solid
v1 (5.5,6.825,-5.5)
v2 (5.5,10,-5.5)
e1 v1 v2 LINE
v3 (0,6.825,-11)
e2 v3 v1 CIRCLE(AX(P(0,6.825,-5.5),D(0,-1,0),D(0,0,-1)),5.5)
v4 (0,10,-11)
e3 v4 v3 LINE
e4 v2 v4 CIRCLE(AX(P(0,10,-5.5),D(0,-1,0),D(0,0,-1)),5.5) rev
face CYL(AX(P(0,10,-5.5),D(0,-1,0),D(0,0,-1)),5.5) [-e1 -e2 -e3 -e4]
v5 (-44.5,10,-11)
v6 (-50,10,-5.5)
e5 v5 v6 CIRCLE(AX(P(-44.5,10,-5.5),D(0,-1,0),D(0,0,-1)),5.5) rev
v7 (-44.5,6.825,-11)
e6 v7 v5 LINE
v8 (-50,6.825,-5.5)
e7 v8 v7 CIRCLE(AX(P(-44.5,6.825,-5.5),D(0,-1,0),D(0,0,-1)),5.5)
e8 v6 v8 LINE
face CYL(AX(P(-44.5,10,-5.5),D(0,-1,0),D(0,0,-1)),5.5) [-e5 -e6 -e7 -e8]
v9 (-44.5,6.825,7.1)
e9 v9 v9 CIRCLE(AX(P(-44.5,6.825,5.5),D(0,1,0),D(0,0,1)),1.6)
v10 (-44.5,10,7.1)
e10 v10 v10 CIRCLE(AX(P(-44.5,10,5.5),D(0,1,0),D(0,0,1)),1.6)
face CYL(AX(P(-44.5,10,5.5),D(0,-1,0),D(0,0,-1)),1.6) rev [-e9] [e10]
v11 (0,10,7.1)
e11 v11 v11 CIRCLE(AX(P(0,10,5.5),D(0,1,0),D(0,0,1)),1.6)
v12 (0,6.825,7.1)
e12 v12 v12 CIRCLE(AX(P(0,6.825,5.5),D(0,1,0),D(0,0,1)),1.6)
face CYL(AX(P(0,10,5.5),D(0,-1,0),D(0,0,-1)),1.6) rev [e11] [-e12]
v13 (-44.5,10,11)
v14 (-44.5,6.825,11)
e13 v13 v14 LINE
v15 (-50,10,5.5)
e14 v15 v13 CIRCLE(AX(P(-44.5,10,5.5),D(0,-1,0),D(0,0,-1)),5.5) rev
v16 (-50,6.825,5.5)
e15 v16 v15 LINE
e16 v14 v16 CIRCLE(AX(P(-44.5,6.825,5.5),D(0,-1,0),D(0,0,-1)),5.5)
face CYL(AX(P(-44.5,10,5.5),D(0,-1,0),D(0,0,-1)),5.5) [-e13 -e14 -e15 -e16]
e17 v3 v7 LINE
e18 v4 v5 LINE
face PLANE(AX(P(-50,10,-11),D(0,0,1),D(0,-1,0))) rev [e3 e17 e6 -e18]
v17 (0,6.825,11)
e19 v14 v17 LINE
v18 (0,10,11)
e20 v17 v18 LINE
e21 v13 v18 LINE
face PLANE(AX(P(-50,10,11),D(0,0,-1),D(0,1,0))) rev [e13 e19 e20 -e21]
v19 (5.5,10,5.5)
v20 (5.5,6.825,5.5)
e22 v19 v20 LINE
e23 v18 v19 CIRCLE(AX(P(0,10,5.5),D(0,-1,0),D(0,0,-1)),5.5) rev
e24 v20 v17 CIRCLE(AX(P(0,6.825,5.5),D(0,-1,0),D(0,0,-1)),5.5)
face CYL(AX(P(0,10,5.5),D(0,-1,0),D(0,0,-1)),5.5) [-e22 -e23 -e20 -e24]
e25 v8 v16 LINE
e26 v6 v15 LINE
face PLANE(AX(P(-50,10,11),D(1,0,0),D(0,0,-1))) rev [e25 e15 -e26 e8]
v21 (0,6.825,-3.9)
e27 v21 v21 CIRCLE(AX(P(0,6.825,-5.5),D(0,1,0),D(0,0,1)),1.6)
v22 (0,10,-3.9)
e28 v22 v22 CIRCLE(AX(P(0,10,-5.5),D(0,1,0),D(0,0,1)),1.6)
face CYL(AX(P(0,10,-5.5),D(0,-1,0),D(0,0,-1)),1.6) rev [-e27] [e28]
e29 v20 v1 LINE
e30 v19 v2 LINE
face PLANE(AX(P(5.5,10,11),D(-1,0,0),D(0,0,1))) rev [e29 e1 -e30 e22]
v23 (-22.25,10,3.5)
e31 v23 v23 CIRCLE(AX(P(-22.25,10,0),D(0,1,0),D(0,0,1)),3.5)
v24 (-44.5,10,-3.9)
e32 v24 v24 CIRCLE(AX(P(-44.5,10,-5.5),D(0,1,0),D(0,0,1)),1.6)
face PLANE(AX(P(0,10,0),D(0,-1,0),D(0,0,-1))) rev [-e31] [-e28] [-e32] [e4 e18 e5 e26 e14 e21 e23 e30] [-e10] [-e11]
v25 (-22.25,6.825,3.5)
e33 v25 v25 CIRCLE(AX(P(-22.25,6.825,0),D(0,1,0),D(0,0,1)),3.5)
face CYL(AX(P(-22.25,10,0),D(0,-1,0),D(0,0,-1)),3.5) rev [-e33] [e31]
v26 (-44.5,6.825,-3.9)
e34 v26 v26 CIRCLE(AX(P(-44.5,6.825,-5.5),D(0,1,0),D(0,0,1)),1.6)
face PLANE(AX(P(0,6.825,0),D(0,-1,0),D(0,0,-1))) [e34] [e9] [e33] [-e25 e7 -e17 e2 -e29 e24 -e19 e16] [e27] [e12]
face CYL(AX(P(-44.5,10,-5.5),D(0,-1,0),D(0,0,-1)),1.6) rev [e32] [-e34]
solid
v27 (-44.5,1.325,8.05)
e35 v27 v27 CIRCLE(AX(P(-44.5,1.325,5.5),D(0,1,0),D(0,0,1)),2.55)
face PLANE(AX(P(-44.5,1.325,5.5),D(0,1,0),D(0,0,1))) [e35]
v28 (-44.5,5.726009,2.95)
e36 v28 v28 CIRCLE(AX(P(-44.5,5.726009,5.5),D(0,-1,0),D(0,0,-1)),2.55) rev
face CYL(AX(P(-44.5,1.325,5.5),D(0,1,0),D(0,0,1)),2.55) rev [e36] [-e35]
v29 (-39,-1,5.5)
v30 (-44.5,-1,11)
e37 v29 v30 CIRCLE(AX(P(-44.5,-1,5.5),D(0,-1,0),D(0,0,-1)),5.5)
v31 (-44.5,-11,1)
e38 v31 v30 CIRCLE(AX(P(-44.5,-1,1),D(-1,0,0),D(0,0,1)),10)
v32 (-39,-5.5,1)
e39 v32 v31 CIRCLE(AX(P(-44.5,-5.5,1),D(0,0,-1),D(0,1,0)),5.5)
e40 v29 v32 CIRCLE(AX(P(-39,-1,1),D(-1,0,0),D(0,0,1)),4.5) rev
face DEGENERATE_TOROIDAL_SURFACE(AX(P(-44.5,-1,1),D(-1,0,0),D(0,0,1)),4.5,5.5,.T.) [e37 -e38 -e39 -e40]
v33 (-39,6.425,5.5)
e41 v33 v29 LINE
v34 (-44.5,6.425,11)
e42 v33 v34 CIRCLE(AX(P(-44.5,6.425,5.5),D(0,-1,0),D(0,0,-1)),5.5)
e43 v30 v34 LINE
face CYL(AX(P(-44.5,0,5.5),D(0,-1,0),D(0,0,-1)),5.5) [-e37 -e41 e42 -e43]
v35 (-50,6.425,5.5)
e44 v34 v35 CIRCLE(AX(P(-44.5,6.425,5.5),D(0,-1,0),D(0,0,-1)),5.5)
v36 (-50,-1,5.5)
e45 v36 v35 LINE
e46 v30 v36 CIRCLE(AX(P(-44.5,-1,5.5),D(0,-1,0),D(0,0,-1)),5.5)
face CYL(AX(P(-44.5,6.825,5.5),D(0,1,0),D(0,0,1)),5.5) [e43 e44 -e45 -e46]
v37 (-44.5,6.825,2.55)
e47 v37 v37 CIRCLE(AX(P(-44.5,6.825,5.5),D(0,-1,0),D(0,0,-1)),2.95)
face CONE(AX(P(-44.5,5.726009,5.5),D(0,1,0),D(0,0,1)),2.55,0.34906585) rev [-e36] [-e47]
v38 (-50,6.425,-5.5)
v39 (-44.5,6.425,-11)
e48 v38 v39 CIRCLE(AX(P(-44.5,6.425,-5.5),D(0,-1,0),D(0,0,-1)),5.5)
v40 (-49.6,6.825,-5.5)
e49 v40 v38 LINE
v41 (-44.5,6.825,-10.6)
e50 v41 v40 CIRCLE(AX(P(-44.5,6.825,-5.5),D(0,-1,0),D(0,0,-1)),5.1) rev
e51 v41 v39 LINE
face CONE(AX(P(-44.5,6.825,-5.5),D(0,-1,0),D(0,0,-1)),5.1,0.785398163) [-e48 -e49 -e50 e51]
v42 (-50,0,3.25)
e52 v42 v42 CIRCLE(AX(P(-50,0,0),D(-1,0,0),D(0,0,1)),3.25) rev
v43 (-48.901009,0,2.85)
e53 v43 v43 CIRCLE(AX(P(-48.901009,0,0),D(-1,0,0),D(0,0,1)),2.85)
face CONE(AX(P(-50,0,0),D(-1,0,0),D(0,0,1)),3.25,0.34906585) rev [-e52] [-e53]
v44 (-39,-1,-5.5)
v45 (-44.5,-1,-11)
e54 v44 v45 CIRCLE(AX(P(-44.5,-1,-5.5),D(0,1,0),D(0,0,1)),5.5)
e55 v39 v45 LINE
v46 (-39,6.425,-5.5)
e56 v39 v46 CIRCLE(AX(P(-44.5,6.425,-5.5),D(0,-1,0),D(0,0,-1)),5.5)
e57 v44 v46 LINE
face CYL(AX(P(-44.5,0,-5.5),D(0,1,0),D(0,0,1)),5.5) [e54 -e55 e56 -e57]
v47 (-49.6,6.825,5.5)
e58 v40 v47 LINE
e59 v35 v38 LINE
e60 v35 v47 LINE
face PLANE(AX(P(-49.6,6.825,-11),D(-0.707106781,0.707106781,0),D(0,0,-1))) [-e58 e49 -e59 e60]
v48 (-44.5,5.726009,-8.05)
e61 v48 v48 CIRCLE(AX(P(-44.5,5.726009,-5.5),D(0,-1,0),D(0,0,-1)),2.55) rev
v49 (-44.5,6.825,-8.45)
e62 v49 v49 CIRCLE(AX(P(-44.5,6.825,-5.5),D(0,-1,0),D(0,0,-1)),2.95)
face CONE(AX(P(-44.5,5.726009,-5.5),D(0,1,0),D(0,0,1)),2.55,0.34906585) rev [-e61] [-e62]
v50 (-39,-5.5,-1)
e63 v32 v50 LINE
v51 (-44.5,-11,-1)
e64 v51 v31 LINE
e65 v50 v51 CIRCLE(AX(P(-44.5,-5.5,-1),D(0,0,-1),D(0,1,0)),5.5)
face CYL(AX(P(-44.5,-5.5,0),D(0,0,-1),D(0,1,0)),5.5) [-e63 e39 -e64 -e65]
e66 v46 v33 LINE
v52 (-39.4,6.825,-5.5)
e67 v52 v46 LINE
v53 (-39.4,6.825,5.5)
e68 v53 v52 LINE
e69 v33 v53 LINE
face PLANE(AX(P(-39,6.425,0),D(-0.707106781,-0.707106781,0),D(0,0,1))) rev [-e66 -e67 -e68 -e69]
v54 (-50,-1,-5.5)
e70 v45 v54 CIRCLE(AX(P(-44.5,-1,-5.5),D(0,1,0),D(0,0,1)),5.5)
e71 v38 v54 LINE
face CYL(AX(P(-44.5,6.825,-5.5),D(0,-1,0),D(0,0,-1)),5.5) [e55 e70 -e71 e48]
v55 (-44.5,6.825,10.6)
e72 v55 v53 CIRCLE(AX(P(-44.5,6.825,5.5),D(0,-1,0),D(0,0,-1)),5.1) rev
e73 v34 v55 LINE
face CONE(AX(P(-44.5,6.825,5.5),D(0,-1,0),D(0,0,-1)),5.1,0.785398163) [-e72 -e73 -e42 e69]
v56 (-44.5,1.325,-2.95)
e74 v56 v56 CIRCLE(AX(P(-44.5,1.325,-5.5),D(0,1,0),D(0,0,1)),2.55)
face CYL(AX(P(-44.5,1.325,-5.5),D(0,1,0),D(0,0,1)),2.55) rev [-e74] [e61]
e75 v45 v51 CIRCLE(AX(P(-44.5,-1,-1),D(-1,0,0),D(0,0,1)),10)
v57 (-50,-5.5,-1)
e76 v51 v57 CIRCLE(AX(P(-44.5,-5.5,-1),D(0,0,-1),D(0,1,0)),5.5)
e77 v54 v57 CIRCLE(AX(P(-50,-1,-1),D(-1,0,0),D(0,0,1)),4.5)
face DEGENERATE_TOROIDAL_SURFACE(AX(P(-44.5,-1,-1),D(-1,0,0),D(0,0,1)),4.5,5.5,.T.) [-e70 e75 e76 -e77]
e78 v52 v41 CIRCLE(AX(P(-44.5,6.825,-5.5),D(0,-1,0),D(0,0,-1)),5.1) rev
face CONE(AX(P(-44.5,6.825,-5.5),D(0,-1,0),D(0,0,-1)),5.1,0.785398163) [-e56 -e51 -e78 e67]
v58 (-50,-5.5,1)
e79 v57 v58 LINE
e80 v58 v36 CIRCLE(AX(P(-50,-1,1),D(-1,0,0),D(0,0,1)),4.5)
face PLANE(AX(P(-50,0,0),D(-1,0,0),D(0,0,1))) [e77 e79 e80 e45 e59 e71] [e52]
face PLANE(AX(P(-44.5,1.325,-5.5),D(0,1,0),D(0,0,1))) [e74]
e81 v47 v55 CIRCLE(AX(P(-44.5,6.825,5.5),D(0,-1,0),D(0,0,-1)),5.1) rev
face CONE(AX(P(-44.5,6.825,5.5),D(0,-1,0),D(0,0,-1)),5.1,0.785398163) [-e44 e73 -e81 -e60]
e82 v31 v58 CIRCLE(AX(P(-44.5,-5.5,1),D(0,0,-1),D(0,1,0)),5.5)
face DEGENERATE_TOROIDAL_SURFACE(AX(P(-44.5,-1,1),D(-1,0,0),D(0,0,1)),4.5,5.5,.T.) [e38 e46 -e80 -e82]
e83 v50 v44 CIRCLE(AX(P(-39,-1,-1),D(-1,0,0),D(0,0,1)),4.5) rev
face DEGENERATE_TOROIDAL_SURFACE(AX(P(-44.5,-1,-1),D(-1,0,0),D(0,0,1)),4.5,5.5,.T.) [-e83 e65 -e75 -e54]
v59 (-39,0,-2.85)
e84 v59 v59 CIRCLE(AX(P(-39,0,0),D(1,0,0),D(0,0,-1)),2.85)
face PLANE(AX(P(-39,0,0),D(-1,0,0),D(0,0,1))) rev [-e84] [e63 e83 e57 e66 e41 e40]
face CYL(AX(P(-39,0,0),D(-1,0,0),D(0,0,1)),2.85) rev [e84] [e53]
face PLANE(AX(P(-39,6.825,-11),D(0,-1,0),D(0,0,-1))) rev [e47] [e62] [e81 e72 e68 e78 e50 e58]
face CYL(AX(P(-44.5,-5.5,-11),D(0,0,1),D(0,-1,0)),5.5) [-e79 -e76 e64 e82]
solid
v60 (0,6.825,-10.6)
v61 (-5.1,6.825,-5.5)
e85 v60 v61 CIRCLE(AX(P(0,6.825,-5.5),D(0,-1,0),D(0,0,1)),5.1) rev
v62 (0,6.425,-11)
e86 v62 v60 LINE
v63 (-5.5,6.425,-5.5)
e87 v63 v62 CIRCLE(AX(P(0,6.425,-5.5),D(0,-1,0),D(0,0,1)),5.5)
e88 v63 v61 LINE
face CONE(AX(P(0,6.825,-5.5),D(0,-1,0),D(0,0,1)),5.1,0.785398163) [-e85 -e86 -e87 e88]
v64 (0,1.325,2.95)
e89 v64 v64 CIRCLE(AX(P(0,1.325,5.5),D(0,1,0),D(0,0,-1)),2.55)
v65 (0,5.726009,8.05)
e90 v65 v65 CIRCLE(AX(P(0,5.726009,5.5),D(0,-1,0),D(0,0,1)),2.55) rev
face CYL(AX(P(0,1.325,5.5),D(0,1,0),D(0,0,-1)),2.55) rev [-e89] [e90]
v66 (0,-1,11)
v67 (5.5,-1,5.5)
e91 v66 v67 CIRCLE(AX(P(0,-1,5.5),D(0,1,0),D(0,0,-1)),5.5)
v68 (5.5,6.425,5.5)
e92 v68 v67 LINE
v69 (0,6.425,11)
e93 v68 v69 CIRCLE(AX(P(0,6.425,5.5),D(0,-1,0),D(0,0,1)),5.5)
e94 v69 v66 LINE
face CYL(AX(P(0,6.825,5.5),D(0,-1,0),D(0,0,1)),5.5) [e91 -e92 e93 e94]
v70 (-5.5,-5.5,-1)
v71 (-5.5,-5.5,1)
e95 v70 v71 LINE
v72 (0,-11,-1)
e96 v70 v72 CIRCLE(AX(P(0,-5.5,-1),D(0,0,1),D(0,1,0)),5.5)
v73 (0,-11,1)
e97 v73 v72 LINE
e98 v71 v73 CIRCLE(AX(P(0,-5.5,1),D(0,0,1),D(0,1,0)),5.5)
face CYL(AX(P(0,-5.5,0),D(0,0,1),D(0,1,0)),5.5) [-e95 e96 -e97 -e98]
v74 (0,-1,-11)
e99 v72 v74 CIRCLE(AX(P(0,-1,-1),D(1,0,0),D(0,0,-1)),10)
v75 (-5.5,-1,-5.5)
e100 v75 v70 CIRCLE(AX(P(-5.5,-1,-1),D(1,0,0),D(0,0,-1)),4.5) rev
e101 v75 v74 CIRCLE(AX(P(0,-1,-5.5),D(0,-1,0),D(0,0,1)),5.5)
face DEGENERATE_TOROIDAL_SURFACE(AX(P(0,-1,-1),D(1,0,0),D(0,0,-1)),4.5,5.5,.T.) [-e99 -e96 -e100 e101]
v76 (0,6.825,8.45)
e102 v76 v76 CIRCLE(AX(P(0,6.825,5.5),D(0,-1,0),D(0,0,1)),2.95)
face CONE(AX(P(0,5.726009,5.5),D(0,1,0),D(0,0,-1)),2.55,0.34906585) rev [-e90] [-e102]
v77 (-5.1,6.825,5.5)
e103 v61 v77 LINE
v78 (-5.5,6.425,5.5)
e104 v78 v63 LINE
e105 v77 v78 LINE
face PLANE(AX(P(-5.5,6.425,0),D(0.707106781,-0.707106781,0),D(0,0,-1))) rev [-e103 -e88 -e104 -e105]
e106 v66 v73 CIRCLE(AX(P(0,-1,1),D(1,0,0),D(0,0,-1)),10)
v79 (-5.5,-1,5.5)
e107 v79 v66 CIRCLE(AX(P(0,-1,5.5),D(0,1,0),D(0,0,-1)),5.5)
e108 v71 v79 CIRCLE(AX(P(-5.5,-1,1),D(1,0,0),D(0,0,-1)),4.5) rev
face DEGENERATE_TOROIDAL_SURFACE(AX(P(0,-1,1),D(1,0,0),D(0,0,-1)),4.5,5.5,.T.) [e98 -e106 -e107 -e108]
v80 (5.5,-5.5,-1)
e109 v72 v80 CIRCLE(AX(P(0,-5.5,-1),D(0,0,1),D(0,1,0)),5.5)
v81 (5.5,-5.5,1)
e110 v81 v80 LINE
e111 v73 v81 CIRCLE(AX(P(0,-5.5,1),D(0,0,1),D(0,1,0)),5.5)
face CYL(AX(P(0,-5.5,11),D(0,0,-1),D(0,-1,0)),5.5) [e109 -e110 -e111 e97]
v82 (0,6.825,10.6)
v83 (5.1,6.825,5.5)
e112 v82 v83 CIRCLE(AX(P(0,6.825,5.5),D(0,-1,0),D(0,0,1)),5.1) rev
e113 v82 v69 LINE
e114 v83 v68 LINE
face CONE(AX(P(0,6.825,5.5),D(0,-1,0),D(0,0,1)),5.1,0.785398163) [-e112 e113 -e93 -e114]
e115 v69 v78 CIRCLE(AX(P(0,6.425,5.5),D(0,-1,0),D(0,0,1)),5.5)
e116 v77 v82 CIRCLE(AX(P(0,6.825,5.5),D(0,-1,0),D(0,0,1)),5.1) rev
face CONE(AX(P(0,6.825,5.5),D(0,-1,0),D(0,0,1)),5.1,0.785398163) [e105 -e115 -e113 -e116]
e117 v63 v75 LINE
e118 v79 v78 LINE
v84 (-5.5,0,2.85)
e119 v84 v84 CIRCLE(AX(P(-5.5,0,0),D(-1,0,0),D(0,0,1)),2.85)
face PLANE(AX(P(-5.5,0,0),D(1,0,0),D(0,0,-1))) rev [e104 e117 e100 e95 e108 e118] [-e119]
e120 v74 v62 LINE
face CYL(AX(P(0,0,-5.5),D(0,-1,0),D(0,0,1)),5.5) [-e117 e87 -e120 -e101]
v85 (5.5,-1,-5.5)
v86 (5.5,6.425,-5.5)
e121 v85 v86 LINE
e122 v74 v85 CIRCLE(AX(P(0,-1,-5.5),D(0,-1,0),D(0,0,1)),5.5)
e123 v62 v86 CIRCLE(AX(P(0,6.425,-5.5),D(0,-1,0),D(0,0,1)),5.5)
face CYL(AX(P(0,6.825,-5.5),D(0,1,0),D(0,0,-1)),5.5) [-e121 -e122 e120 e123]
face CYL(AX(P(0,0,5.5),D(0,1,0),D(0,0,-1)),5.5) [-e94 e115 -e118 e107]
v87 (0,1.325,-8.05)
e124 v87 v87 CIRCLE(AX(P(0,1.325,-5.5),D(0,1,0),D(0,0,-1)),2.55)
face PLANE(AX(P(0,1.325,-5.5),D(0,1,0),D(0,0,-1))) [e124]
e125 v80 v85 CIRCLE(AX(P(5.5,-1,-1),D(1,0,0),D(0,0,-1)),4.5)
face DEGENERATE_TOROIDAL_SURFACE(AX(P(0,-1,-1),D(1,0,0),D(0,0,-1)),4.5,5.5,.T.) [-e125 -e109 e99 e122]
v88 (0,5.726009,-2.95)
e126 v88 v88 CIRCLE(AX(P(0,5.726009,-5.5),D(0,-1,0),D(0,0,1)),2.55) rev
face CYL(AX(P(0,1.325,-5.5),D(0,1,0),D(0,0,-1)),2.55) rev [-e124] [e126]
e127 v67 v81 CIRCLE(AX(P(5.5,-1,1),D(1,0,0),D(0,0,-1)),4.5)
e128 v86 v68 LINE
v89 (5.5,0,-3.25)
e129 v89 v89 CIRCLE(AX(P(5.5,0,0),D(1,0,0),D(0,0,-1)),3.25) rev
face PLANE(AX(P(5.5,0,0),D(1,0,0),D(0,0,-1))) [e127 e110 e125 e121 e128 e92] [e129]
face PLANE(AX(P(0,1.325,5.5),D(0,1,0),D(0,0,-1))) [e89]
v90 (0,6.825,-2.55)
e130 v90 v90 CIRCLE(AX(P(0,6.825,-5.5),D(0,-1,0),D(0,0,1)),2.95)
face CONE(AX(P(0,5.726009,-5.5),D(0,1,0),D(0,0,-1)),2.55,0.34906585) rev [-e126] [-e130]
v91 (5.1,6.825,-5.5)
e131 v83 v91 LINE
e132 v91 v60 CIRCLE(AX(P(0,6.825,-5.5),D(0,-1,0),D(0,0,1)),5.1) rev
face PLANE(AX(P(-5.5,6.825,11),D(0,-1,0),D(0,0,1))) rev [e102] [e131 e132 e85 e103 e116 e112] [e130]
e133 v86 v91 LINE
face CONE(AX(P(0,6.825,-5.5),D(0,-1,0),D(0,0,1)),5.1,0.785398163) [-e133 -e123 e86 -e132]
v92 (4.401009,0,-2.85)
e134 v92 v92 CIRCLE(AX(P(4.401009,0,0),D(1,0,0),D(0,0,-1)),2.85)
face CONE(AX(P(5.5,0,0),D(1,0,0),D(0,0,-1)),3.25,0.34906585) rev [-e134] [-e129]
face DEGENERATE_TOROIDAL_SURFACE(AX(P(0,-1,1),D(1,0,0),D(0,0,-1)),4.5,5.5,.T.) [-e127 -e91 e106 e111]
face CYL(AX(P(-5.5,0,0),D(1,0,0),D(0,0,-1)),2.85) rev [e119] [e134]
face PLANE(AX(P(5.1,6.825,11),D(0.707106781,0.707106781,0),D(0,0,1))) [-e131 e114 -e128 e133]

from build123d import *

# Parameters (mm, degrees)
SKETCH2_W             = 22
SKETCH2_H             = 17.825
SKETCH2_R             = 2.85
BOSS_EXTRUDE1_DEPTH   = 5.5
FILLET1_R             = 10
FILLET2_R             = 5.5
SKETCH4_R             = 2.55
CUT_EXTRUDE1_DEPTH    = 5.5
CHAMFER1_SIZE         = 0.4
CHAMFER1_SIZE2        = 1.098990968
CHAMFER4_SIZE         = 0.4
CHAMFER5_SIZE         = 0.4
CHAMFER5_SIZE2        = 1.098990968
BODY_MOVE_COPY1_ANGLE = 180
SKETCH5_W             = 55.5
SKETCH5_H             = 22
SKETCH5_R             = 1.6
SKETCH5_R_2           = 3.5
BOSS_EXTRUDE2_DEPTH   = 3.175
FILLET3_R             = 5.5


with BuildPart() as part:
    # Sketch2 → Boss-Extrude1 (new, symmetric)
    with BuildSketch(Plane(origin=(0, 0, 0), x_dir=(0, 0, -1), z_dir=(1, 0, 0))):
        with Locations((0, -2.0875)):
            Rectangle(SKETCH2_W, SKETCH2_H)
        Circle(SKETCH2_R, mode=Mode.SUBTRACT)
    extrude(amount=BOSS_EXTRUDE1_DEPTH, both=True)

    # Fillet1
    fillet1_edges = [part.edges().sort_by_distance(p)[0] for p in [
        (0, -11, -11),
        (0, -11, 11),
    ]]
    fillet(fillet1_edges, radius=FILLET1_R)

    # Fillet2
    fillet2_edges = [part.edges().sort_by_distance(p)[0] for p in [
        (-5.5, 2.9125, -11),
        (-5.5, -8.071067812, -8.071067812),
        (-5.5, -8.071067812, 8.071067812),
        (5.5, 2.9125, -11),
        (5.5, -8.071067812, -8.071067812),
        (5.5, -8.071067812, 8.071067812),
        (-5.5, 2.9125, 11),
        (5.5, 2.9125, 11),
        (-5.5, -11, 0),
        (5.5, -11, 0),
    ]]
    fillet(fillet2_edges, radius=FILLET2_R - 0.0001)  # a hair under: the kernel refuses the full size

    # Sketch4 → Cut-Extrude1 (cut)
    with BuildSketch(Plane(origin=(0, 6.825, 0), x_dir=(1, 0, 0), z_dir=(0, 1, 0))):
        with Locations(Location((0, 5.5, 0), (0, 0, 270))):
            Circle(SKETCH4_R)
        with Locations(Location((0, -5.5, 0), (0, 0, 270))):
            Circle(SKETCH4_R)
    extrude(amount=-CUT_EXTRUDE1_DEPTH, mode=Mode.SUBTRACT)

    # Chamfer1
    chamfer1_edges = [part.edges().sort_by_distance(p)[0] for p in [
        (-5.5, 0, 2.85),
    ]]
    chamfer1_side = [part.faces().sort_by_distance(p)[0] for p in [
        (-5.5, 6.659799367, 0),
    ]]
    chamfer(chamfer1_edges, length=CHAMFER1_SIZE, length2=CHAMFER1_SIZE2, reference=chamfer1_side[0])

    # Chamfer4
    chamfer4_edges = [part.edges().sort_by_distance(p)[0] for p in [
        (-5.5, 6.825, 0),
        (5.5, 6.825, 0),
        (3.889116586, 6.825, 9.389116586),
        (-3.889116586, 6.825, 9.389116586),
        (3.889116586, 6.825, -9.389116586),
        (-3.889116586, 6.825, -9.389116586),
    ]]
    chamfer(chamfer4_edges, length=CHAMFER4_SIZE)

    # Chamfer5
    chamfer5_edges = [part.edges().sort_by_distance(p)[0] for p in [
        (0, 6.825, -8.05),
        (0, 6.825, 2.95),
    ]]
    chamfer5_side = [part.faces().sort_by_distance(p)[0] for p in [
        (0, 6.825, 0),
    ]]
    chamfer(chamfer5_edges, length=CHAMFER5_SIZE, length2=CHAMFER5_SIZE2, reference=chamfer5_side[0])


with BuildPart() as body_2:
    # Body-Move/Copy1: copy of part
    add(part.part.rotate(Axis((0, 0, 0), (0, 1, 0)), BODY_MOVE_COPY1_ANGLE))


with BuildPart() as part_1:
    # Body-Move/Copy3: read off the stored shape, not the designer's step
    # Body-Move/Copy3: moved
    add(part.part.moved(Location((-44.5, 0, 0))))


with BuildPart() as body_3:
    # Sketch5 → Boss-Extrude2 (new body)
    with BuildSketch(Plane(origin=(0, 6.825, 0), x_dir=(1, 0, 0), z_dir=(0, 1, 0))):
        with Locations((-22.25, 0)):
            Rectangle(SKETCH5_W, SKETCH5_H)
        with Locations(Location((-44.5, 5.5, 0), (0, 0, 270))):
            Circle(SKETCH5_R, mode=Mode.SUBTRACT)
        with Locations(Location((0, -5.5, 0), (0, 0, 270))):
            Circle(SKETCH5_R, mode=Mode.SUBTRACT)
        with Locations(Location((0, 5.5, 0), (0, 0, 270))):
            Circle(SKETCH5_R, mode=Mode.SUBTRACT)
        with Locations(Location((-44.5, -5.5, 0), (0, 0, 270))):
            Circle(SKETCH5_R, mode=Mode.SUBTRACT)
        with Locations(Location((-22.25, 0, 0), (0, 0, 270))):
            Circle(SKETCH5_R_2, mode=Mode.SUBTRACT)
    extrude(amount=BOSS_EXTRUDE2_DEPTH)

    # Fillet3
    fillet3_edges = [body_3.edges().sort_by_distance(p)[0] for p in [
        (5.5, 8.4125, 11),
        (-50, 8.4125, 11),
        (-50, 8.4125, -11),
        (5.5, 8.4125, -11),
    ]]
    fillet(fillet3_edges, radius=FILLET3_R)


solid = Compound([body_2.part, part_1.part, body_3.part])
